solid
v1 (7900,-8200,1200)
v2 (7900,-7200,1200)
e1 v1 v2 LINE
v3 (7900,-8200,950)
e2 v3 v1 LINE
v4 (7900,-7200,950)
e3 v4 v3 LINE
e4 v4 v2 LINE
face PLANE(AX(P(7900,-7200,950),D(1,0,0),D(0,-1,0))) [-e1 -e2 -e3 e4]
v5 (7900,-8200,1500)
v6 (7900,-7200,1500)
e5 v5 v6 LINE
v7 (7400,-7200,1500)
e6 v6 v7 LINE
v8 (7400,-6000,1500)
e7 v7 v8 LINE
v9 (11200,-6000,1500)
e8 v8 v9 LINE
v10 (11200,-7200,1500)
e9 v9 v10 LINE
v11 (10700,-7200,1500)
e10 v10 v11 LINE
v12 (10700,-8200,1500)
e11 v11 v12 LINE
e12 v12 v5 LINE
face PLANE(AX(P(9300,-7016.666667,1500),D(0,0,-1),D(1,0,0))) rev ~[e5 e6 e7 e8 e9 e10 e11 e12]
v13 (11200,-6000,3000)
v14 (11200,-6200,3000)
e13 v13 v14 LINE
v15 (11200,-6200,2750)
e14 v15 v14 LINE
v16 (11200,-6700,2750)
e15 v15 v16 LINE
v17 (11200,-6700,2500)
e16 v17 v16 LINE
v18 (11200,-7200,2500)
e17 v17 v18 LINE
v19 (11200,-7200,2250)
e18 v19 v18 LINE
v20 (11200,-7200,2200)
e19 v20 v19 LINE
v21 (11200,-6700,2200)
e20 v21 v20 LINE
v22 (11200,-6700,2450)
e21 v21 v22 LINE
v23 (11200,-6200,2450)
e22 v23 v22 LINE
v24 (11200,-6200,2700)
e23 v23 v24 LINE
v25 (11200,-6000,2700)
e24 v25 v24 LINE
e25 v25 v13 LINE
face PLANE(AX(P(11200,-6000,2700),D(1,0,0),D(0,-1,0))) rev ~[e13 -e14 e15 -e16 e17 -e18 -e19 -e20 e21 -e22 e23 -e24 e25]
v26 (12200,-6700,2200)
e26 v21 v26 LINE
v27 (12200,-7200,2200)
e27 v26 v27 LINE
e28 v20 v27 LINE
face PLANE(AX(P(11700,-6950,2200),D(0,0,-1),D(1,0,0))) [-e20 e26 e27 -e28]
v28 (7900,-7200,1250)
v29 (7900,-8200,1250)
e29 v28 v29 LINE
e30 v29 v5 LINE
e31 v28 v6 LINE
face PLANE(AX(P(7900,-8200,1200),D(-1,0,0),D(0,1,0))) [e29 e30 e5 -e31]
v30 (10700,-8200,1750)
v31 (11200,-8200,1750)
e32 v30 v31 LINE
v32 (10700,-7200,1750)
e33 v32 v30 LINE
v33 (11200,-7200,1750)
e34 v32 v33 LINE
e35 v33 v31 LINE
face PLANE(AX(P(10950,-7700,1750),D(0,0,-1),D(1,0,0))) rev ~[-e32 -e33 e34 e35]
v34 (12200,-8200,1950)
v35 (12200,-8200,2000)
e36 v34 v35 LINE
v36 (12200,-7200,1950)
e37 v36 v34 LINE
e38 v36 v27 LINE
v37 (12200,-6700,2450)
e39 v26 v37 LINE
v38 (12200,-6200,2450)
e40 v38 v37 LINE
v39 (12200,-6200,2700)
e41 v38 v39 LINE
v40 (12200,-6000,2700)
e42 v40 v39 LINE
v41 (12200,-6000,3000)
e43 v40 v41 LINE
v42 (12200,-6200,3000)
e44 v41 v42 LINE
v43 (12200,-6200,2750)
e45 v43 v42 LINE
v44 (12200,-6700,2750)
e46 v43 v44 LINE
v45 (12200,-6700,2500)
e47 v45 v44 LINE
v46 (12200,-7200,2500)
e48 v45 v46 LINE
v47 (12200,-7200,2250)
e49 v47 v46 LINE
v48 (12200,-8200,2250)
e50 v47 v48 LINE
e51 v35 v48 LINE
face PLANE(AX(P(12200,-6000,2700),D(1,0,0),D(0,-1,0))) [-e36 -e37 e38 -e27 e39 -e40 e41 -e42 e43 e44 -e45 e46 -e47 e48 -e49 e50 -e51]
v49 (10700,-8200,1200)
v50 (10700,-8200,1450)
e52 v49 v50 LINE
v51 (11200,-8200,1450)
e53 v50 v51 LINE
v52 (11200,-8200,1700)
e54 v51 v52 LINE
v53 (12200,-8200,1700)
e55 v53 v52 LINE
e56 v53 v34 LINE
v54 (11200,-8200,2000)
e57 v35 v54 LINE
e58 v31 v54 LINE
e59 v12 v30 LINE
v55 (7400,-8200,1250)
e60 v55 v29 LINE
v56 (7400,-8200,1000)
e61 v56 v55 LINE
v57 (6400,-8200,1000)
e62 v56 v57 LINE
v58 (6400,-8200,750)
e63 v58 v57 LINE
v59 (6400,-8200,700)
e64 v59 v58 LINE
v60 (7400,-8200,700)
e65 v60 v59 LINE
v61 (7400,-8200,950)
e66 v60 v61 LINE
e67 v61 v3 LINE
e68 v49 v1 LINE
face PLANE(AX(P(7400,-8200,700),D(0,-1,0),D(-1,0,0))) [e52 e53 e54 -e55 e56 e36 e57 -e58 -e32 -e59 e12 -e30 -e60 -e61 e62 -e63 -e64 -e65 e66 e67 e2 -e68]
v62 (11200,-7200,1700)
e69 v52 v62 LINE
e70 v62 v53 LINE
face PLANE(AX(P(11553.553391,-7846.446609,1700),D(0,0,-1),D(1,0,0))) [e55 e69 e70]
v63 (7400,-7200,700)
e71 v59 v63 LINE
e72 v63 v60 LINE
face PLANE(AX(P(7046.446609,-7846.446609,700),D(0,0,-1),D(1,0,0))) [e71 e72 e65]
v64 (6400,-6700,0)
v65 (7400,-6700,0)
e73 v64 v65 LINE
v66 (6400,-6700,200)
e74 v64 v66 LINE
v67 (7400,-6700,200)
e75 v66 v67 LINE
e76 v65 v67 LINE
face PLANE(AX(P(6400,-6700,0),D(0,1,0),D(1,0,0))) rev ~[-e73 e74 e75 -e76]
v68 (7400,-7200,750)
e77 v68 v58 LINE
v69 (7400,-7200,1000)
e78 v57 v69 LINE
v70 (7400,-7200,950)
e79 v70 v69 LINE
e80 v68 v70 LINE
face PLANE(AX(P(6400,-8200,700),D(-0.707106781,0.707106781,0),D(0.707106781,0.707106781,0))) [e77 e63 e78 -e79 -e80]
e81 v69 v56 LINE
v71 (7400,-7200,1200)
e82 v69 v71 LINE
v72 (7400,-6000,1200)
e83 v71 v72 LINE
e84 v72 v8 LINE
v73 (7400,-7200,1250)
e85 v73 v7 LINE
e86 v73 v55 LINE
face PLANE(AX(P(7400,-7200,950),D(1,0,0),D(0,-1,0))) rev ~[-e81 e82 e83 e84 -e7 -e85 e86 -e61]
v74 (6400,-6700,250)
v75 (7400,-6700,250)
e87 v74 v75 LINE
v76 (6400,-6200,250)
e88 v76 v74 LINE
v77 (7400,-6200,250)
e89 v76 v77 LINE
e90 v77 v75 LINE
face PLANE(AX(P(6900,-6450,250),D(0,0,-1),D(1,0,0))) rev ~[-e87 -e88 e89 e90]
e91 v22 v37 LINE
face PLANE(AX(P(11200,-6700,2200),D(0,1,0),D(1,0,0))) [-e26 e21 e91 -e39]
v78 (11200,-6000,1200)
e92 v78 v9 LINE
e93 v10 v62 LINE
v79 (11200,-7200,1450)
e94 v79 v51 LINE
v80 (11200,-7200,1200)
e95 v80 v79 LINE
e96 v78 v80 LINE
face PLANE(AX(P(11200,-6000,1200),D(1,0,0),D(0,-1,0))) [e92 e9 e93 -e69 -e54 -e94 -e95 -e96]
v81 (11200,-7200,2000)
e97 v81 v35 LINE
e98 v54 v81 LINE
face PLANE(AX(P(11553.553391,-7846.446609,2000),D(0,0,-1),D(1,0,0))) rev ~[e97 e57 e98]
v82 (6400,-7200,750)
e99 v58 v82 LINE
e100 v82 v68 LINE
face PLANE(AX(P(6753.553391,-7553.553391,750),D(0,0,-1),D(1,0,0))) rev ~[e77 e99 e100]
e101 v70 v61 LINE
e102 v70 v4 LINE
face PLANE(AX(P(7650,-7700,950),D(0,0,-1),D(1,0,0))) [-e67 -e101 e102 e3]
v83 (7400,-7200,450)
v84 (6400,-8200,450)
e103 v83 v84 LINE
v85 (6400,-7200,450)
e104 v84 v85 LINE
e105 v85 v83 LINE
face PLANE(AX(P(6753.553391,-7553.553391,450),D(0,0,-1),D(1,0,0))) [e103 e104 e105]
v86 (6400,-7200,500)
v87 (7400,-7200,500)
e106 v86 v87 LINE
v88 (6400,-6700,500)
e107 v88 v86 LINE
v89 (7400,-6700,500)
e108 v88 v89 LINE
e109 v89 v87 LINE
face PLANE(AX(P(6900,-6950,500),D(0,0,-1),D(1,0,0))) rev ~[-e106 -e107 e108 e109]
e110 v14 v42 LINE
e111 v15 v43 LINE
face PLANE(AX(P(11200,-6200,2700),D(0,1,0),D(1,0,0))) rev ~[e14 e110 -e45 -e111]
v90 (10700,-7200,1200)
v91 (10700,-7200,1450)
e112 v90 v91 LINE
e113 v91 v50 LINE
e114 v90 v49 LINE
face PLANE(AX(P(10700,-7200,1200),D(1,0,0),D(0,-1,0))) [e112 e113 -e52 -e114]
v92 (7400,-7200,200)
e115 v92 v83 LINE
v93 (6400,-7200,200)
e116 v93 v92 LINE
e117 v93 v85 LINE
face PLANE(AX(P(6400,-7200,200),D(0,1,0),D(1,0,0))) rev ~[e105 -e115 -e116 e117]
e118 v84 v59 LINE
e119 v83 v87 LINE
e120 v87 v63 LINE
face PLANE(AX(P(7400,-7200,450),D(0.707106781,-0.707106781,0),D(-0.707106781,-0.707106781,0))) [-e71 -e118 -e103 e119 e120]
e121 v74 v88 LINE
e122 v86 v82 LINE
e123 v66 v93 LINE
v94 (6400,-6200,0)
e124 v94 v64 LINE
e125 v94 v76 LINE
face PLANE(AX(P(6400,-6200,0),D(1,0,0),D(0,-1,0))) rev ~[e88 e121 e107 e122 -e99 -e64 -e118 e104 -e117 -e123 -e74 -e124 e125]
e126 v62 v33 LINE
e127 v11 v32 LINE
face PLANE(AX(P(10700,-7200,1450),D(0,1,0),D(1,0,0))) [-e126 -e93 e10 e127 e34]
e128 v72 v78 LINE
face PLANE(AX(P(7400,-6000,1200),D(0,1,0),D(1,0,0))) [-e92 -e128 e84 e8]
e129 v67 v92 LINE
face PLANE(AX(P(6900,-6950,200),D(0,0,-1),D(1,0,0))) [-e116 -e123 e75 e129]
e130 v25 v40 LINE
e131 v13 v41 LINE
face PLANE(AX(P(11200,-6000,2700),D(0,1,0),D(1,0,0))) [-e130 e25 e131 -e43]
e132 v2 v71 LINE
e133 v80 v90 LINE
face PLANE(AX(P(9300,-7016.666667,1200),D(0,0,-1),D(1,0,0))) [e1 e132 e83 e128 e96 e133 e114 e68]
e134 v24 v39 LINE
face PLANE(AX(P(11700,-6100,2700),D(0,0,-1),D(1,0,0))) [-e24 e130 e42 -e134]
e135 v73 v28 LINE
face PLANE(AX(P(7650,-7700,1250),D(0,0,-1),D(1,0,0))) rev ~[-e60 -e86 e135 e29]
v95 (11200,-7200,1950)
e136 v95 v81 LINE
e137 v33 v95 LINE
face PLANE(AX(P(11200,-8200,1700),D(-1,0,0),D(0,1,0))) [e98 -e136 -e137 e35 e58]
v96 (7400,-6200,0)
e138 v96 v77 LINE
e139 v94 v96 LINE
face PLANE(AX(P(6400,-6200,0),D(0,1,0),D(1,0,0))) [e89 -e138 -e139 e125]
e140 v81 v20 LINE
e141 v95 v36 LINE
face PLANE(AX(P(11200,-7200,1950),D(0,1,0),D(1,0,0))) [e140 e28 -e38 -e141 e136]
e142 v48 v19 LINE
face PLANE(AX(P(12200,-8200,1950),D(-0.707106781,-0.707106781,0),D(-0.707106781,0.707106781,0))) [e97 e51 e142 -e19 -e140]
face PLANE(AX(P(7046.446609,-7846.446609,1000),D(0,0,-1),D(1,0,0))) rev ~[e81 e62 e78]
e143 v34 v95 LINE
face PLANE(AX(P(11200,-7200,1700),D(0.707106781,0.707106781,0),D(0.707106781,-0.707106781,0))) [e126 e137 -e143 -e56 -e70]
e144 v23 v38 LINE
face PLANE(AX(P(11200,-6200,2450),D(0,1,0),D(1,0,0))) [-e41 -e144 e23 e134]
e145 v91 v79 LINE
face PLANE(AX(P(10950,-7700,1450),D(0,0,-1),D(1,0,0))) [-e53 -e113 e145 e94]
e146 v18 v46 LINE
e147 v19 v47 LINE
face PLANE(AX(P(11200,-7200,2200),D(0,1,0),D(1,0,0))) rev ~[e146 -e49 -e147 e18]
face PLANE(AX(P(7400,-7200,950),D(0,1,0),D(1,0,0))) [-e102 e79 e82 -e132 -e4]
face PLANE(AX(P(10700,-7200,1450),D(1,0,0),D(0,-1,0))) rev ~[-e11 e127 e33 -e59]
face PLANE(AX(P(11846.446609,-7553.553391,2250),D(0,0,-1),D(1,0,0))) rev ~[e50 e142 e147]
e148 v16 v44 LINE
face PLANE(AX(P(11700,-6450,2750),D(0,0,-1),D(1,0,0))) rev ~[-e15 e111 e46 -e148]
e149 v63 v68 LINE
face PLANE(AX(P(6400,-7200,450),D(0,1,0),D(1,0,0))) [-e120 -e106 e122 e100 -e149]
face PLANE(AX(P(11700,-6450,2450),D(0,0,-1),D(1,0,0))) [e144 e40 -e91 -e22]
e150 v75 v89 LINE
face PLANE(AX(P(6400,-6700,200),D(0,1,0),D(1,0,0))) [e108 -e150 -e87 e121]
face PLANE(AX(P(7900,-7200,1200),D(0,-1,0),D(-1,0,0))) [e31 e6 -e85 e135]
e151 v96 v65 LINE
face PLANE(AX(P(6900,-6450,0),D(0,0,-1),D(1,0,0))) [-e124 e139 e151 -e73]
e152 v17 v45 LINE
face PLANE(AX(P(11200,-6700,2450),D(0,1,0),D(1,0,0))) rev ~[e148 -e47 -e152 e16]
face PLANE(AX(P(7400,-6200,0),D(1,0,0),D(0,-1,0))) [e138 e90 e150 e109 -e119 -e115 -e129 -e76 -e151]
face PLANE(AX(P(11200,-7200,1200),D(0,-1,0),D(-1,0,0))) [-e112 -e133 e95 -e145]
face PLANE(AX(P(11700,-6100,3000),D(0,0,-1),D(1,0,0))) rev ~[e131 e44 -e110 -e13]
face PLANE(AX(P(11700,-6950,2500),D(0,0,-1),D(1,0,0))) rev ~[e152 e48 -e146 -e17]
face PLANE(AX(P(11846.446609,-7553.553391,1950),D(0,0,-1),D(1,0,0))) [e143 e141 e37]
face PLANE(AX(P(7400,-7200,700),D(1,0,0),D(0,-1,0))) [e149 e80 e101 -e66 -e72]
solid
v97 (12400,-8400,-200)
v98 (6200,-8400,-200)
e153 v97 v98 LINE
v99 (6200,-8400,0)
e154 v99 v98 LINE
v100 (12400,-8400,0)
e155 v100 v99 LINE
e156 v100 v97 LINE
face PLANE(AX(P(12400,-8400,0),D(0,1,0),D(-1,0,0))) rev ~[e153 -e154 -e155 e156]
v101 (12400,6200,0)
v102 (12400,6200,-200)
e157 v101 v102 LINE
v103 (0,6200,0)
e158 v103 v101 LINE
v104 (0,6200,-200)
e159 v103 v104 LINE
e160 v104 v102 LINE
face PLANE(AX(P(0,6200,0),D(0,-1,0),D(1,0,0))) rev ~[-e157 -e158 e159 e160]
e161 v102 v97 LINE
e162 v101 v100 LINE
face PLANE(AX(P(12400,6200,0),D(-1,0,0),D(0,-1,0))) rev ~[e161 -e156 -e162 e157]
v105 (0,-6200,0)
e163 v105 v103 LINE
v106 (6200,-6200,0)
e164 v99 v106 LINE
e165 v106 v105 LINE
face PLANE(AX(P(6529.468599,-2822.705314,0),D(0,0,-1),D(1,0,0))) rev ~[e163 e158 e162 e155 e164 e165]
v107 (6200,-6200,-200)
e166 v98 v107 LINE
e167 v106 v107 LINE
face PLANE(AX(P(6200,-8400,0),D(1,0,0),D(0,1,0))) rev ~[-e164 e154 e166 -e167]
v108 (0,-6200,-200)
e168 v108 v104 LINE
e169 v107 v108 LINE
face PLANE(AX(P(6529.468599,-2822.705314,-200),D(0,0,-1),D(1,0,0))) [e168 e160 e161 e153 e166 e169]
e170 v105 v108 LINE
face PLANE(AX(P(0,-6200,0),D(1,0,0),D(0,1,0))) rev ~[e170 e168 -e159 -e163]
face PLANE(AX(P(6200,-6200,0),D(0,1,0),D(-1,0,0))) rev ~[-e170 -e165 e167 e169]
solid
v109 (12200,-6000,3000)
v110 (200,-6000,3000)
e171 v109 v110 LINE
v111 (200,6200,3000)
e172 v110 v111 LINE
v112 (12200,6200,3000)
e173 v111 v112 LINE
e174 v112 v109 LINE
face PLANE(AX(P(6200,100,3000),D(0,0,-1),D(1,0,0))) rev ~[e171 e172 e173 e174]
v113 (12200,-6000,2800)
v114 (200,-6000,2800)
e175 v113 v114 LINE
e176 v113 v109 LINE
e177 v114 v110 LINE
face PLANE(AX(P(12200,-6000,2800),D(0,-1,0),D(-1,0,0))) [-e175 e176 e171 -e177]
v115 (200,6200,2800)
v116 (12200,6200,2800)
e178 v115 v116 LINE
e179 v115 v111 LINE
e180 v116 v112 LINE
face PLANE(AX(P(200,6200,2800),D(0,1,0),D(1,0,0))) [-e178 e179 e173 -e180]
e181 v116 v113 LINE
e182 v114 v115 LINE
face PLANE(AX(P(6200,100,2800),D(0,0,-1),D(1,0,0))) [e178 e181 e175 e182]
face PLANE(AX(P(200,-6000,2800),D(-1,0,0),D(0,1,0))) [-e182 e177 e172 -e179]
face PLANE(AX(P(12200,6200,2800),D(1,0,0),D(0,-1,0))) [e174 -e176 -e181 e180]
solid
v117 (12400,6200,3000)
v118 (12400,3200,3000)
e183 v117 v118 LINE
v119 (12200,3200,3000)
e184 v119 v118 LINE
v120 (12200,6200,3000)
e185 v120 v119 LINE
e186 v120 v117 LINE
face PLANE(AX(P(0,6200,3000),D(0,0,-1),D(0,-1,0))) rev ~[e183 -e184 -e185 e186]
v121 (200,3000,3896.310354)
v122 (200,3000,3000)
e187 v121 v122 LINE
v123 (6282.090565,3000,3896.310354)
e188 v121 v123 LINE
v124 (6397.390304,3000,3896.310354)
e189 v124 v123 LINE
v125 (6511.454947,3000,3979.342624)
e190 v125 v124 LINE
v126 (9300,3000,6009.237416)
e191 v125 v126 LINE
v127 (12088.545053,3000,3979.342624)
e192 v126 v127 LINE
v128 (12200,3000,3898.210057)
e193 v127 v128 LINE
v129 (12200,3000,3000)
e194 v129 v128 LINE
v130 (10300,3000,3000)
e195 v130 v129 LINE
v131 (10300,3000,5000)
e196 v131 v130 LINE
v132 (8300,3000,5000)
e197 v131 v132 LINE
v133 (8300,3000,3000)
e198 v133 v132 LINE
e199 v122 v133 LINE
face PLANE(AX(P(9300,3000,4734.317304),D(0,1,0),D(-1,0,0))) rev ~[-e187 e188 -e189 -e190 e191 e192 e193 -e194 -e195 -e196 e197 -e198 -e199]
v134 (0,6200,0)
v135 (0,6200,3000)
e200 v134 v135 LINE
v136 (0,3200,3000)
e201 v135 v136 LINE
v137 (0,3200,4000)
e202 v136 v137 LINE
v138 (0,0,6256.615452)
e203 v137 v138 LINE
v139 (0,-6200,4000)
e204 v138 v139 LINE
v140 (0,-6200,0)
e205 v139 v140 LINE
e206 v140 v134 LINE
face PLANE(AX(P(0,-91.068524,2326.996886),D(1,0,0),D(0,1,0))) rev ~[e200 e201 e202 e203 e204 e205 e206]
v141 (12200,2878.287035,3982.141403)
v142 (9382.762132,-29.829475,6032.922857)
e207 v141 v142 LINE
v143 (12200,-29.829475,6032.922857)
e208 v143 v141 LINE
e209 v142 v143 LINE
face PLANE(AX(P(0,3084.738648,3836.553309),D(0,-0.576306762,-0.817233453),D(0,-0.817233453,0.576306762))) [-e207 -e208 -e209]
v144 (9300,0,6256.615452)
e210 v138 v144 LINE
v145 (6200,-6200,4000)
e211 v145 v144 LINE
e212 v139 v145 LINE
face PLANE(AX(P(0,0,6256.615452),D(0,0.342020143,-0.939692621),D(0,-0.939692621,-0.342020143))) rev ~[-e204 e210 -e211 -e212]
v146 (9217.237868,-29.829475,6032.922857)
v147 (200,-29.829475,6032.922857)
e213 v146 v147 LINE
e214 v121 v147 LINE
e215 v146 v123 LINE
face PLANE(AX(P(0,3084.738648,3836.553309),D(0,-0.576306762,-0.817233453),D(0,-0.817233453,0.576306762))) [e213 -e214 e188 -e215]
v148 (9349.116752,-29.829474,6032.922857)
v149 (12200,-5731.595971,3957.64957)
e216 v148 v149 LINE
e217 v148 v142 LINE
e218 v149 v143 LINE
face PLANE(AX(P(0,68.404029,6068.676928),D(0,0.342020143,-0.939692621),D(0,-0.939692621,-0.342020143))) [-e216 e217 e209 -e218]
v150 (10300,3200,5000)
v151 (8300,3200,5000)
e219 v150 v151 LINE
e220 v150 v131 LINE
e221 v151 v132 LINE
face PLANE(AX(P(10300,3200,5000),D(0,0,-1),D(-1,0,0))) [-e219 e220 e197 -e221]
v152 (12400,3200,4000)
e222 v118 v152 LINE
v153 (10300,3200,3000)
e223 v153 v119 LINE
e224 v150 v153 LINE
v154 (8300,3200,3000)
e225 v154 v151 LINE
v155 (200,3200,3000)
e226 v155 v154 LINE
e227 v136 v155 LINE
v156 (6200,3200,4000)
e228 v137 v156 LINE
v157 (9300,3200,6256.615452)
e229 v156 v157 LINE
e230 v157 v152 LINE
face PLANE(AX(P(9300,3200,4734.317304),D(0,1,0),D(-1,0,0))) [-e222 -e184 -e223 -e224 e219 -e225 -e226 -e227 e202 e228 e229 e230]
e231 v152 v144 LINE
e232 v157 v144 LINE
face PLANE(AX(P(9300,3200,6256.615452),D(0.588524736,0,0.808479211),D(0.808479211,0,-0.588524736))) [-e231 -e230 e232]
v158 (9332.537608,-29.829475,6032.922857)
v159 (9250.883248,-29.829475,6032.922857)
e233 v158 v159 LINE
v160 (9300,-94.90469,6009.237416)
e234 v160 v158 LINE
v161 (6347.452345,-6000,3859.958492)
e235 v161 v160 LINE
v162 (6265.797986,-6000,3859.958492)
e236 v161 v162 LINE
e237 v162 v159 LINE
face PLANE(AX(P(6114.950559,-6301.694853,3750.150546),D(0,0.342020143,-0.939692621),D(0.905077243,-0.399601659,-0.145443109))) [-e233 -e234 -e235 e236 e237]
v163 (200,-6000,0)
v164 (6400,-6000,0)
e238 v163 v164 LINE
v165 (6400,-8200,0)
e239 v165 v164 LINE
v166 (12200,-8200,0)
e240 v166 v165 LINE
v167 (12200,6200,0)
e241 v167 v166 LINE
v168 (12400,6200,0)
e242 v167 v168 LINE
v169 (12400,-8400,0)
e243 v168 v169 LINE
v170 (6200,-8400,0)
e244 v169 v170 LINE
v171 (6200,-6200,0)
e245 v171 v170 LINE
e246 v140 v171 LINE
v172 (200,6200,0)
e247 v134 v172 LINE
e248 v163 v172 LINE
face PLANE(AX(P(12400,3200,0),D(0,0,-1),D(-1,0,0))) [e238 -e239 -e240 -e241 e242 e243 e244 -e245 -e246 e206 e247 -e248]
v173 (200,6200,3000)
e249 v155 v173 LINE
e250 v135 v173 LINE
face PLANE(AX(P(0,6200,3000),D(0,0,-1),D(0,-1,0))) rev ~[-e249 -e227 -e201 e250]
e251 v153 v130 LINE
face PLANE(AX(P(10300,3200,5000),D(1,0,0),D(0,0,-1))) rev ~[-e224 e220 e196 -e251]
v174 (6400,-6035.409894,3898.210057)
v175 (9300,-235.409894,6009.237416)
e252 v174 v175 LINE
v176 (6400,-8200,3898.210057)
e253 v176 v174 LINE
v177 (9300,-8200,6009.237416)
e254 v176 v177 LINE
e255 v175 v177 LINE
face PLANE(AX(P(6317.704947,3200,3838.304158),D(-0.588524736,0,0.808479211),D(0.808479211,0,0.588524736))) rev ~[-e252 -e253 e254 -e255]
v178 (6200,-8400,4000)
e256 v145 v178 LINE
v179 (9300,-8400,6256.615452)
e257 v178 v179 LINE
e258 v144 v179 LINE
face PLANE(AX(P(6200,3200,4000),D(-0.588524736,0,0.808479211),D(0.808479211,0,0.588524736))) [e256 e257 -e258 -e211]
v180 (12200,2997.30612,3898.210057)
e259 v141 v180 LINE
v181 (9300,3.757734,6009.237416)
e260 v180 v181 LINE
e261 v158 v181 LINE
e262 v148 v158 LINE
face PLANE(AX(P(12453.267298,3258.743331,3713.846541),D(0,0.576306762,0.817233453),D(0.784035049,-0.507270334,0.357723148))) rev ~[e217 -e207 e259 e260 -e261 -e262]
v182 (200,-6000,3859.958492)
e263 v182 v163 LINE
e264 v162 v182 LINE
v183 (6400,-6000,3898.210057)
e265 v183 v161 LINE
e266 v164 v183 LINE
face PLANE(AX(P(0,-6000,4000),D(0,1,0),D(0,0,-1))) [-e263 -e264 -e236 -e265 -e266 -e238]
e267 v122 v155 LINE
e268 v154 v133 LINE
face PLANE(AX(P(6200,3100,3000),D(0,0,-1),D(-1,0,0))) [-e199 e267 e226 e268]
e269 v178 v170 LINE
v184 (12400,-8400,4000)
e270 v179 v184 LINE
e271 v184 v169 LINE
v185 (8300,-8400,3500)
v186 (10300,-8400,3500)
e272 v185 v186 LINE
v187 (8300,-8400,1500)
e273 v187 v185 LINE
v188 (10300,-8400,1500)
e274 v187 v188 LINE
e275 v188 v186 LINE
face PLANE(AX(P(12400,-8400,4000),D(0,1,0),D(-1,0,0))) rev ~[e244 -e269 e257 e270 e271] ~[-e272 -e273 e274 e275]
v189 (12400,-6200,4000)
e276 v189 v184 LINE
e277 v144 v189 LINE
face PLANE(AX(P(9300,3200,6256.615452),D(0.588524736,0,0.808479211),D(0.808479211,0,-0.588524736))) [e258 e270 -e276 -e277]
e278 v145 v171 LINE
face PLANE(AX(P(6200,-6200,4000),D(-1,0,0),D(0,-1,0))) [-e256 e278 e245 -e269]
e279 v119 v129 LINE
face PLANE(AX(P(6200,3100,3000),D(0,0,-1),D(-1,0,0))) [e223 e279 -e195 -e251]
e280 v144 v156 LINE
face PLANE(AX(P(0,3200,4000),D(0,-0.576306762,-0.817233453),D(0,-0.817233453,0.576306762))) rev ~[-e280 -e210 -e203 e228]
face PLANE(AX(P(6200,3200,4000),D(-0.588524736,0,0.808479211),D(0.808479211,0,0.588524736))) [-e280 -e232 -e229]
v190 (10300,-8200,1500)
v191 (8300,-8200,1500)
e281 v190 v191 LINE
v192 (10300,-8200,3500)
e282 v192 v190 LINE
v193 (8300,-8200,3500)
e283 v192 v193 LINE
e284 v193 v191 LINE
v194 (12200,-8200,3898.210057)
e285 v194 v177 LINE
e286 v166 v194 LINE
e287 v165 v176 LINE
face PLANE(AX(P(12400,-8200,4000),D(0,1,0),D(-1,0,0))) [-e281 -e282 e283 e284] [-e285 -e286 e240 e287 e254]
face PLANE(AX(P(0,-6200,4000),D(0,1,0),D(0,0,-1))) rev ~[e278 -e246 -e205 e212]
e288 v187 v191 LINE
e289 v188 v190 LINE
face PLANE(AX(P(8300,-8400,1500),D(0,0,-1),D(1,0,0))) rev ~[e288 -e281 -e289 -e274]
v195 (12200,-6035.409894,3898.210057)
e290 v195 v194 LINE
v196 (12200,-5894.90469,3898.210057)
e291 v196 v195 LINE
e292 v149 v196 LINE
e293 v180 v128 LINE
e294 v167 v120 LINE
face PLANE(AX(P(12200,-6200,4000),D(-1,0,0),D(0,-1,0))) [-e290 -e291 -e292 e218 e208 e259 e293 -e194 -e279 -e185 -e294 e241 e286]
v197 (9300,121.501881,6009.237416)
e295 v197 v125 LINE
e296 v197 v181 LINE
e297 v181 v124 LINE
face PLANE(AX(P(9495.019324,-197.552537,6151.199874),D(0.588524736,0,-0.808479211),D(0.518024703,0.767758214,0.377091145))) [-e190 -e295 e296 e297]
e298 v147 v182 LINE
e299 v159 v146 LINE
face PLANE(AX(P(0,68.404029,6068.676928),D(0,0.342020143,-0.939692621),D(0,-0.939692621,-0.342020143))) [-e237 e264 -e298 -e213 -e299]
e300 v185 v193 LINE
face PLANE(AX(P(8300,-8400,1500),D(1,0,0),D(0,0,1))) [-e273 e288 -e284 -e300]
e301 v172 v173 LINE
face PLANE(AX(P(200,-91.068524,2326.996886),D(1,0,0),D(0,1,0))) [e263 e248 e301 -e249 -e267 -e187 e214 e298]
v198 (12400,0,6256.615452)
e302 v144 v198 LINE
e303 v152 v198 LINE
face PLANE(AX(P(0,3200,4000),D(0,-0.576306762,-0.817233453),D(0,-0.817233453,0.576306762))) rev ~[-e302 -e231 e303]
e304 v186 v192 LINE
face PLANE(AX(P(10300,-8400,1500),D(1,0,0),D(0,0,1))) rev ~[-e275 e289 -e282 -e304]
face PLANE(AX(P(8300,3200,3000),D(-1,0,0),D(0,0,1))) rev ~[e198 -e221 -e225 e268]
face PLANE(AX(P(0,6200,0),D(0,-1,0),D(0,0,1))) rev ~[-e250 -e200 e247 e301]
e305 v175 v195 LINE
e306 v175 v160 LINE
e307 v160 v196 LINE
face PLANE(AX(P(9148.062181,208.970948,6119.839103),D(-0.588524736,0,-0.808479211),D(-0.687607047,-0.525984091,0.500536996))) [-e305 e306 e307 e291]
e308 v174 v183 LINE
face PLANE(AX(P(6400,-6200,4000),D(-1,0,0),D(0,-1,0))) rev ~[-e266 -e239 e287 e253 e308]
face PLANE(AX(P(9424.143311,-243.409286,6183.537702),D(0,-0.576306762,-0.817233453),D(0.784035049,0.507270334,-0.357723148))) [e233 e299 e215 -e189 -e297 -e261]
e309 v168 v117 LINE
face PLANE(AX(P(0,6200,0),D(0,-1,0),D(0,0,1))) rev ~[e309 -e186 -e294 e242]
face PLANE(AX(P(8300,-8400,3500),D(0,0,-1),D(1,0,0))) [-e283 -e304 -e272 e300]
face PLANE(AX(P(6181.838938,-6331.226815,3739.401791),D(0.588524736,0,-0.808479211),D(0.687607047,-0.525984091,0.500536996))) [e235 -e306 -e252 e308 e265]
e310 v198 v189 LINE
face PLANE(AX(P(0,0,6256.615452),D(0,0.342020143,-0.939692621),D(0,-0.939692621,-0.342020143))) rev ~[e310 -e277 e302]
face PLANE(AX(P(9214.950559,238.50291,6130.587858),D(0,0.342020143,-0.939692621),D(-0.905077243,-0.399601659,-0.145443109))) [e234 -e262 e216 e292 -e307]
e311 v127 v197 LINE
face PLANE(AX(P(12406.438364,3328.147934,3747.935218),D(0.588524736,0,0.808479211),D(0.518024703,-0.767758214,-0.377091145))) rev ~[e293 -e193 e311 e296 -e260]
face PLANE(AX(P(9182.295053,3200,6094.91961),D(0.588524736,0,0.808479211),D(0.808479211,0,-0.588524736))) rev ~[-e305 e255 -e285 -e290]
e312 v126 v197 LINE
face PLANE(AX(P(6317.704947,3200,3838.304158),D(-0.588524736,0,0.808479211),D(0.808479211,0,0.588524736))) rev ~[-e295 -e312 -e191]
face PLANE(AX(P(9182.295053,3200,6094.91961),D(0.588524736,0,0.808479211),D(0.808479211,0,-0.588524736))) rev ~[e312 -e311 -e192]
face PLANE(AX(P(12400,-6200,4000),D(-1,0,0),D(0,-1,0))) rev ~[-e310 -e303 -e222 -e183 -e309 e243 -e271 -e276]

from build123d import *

# Parameters (mm, degrees)
F14_DEPTH    = 12400
F15_W        = 2000
F15_H        = 1000
F0_DEPTH     = 11600
F16_DEPTH    = 4000
F1_T         = 200
F1_T3_DEPTH  = 7689.8774544047
F1_T5_DEPTH  = 5394.2279984236
F1_T7_DEPTH  = 5394.2279984236
F1_T9_DEPTH  = 7689.8774544047
F1_T11_DEPTH = 4400
F2_W         = 2000
F2_H         = 2000
F17_DEPTH    = 2400
F18_DEPTH    = 200
F3_W         = 1000
F3_H         = 500
F3_W_2       = 500
F3_H_2       = 1000
F3_H_3       = 200
F4_DEPTH     = 200
F5_START     = -2800
F5_DEPTH     = 200
F6_START     = -1200
F6_DEPTH     = 300
F7_START     = -1450
F7_DEPTH     = 300
F19_START    = -1700
F19_DEPTH    = 300
F20_START    = -1950
F20_DEPTH    = 300
F21_START    = -2200
F21_DEPTH    = 300
F8_START     = -2450
F8_DEPTH     = 300
F22_START    = -2700
F22_DEPTH    = 300
F9_START     = -950
F9_DEPTH     = 300
F10_START    = -700
F10_DEPTH    = 300
F11_START    = -450
F11_DEPTH    = 300
F23_START    = -200
F23_DEPTH    = 300
F12_DEPTH    = 250


# Not quite as in the source:
# - an extrude ends at something that could not be found from the text; its depth is read off the source's solid
# - a shell that OpenCascade refuses in one call is made with other operations: the cavity is built on its own and cut out


with BuildPart() as f14:
    # F13 (on Right) → F14 (new body)
    with BuildSketch(Plane.YZ):
        Polygon((-6200, 0), (6200, 0), (6200, 3000), (3200, 3000), (3200, 4000), (0, 6256.6154524505), (-6200, 4000), align=None)
    extrude(amount=F14_DEPTH)

    # F15 (on face) → F0 (join)
    with BuildSketch(Plane(origin=(0, 3200, 0), x_dir=(-1, 0, 0), z_dir=(0, 1, 0))):
        Polygon((-9300, 6256.6154524505), (-12400, 4000), (-10300, 4000), (-10300, 5000), (-8300, 5000), (-8300, 4000), (-6200, 4000), align=None)
        with Locations((-9300, 4500)):
            Rectangle(F15_W, F15_H)
    extrude(amount=-F0_DEPTH)

    # F16 (add, through all): a face of the model
    f16_faces = [f14.faces().sort_by_distance(p)[0] for p in [
        (9300, -7300, 4000),
    ]]
    extrude(f16_faces, amount=F16_DEPTH)

    # F1: shell of thickness 200, made by hand


with BuildPart() as f1_core1:
    # F1_t2: copy of F14
    add(f14.part)

    # the walls: a layer under each face that stays
    f1_faces = [f1_core1.faces().sort_by_distance(p)[0] for p in [
        (4650, -3100, 5128.3077262252),
        (4650, 1600, 5128.3077262252),
        (10333.3333333333, 3200, 3542.7692420751),
        (9816.6666666667, 1600, 5880.512877042),
        (11883.3333333333, 1600, 5128.3077262252),
        (11883.3333333333, -1033.3333333333, 5880.512877042),
        (10850, -4200, 5128.3077262252),
        (9300, -8400, 3128.3077262252),
        (6200, -7300, 2000),
        (12400, -1100, 3128.3077262252),
        (7750, 2666.6666666667, 5128.3077262252),
        (7750, -4200, 5128.3077262252),
        (3100, -6200, 2000),
        (0, 0, 3128.3077262252),
    ]]
    thicken(f1_faces, amount=-F1_T, mode=Mode.SUBTRACT)

    # F1_s4 → F1_t3 (cut)
    with BuildSketch(Plane(origin=(-679.6785869535, -1359.357173907, -494.7655490384), x_dir=(-0.894427191, 0.4472135955, 0), z_dir=(0.4252472033, 0.8504944066, 0.3095546484))):
        Polygon((-8317.4260033625, 4665.513258174), (-8287.5816646932, 4464.1897106586), (-8360.6155438547, 4452.8857222652), (-8423.4513815758, 4491.7879735735), align=None)
    extrude(amount=F1_T3_DEPTH, mode=Mode.SUBTRACT)

    # F1_s6 → F1_t5 (cut)
    with BuildSketch(Plane(origin=(5462.1086087811, -5638.3056606773, 3976.089899851), x_dir=(-0.7182402228, -0.6957952158, 0), z_dir=(-0.6207165554, 0.6407396701, -0.4518447002))):
        Polygon((-6679.5906506398, 2661.3103147543), (-6599.4357743978, 2474.4492579485), (-6682.2486847174, 2438.2000137734), (-6764.1744994282, 2476.4118797687), align=None)
    extrude(amount=F1_T5_DEPTH, mode=Mode.SUBTRACT)

    # F1_s8 → F1_t7 (cut)
    with BuildSketch(Plane(origin=(5052.5541970253, 5215.5398162841, -3677.9586694679), x_dir=(0.7182402228, -0.6957952158, 0), z_dir=(-0.6207165554, -0.6407396701, 0.4518447002))):
        Polygon((6679.6774932388, 8508.9899951089), (6595.0936444505, 8324.0915601233), (6677.0194591612, 8285.8796941281), (6759.8323694808, 8322.1289383031), align=None)
    extrude(amount=F1_T7_DEPTH, mode=Mode.SUBTRACT)

    # F1_s10 → F1_t9 (cut)
    with BuildSketch(Plane(origin=(773.1141266852, -1546.2282533704, -562.7810596082), x_dir=(0.894427191, 0.4472135955, 0), z_dir=(0.4252472033, -0.8504944066, -0.3095546484))):
        Polygon((8318.9197492359, 7240.4423384247), (8348.7640879052, 7039.1187909094), (8275.7302087437, 7027.8148025159), (8212.8943710226, 7066.7170538243), align=None)
    extrude(amount=F1_T9_DEPTH, mode=Mode.SUBTRACT)

    # F1_s12 → F1_t11 (cut)
    with BuildSketch(Plane.XY.offset(-200)):
        Polygon((6198, -6202), (6400, -6200), (6400, -6000), (6200, -6000), align=None)
    extrude(amount=F1_T11_DEPTH, mode=Mode.SUBTRACT)


with BuildPart() as f14_1:
    add(f14.part)

    # what is left inside the walls is the cavity
    f1_cavity = [f1_core1.part.solids().sort_by_distance(p)[0] for p in [
        (8200, -1000, 2),
    ]]
    add(f1_cavity, mode=Mode.SUBTRACT)

    # F2 (on face) → F17 (cut, through all)
    with BuildSketch(Plane.XZ.offset(8400)):
        with Locations((9300, 2500)):
            Rectangle(F2_W, F2_H)
    extrude(amount=-F17_DEPTH, mode=Mode.SUBTRACT)

    # F15 (on face) → F18 (cut, through all)
    with BuildSketch(Plane(origin=(0, 3200, 0), x_dir=(-1, 0, 0), z_dir=(0, 1, 0))):
        with Locations((-9300, 3500)):
            Rectangle(F15_W, F15_H)
        with Locations((-9300, 4500)):
            Rectangle(F15_W, F15_H)
    extrude(amount=-F18_DEPTH, mode=Mode.SUBTRACT)


with BuildPart() as f4:
    # F3 (on face) → F4 (new body)
    with BuildSketch(Plane(origin=(0, 0, 0), x_dir=(1, 0, 0), z_dir=(0, 0, -1))):
        Polygon((200, 6000), (6400, 6000), (6400, 6200), (6400, 6700), (6400, 7200), (6400, 8200), (7400, 8200), (7900, 8200), (10700, 8200), (11200, 8200), (12200, 8200), (12200, 7200), (12200, 6700), (12200, 6200), (12200, 6000), (12200, -6200), (12400, -6200), (12400, 8400), (6200, 8400), (6200, 6200), (0, 6200), (0, -6200), (200, -6200), align=None)
        Polygon((7400, 6000), (6400, 6000), (200, 6000), (200, -6200), (12200, -6200), (12200, 6000), (11200, 6000), align=None)
        Polygon((6400, 8200), (6400, 7200), (7400, 7200), align=None)
        with Locations((6900, 6950)):
            Rectangle(F3_W, F3_H)
        Polygon((7400, 8200), (6400, 8200), (7400, 7200), align=None)
        with Locations((7650, 7700)):
            Rectangle(F3_W_2, F3_H_2)
        Polygon((7400, 6200), (7400, 6000), (11200, 6000), (11200, 6200), (11200, 6700), (11200, 7200), (10700, 7200), (10700, 8200), (7900, 8200), (7900, 7200), (7400, 7200), (7400, 6700), align=None)
        with Locations((6900, 6450)):
            Rectangle(F3_W, F3_H)
        with Locations((6900, 6100)):
            Rectangle(F3_W, F3_H_3)
        with Locations((11700, 6100)):
            Rectangle(F3_W, F3_H_3)
        with Locations((11700, 6450)):
            Rectangle(F3_W, F3_H)
        with Locations((11700, 6950)):
            Rectangle(F3_W, F3_H)
        Polygon((12200, 8200), (11200, 7200), (12200, 7200), align=None)
        Polygon((11200, 8200), (11200, 7200), (12200, 8200), align=None)
        with Locations((10950, 7700)):
            Rectangle(F3_W_2, F3_H_2)
    extrude(amount=F4_DEPTH)


with BuildPart() as f5:
    # F3 (on face) → F5 (new body)
    with BuildSketch(Plane(origin=(0, 0, 0), x_dir=(1, 0, 0), z_dir=(0, 0, -1)).offset(F5_START)):
        Polygon((7400, 6000), (6400, 6000), (200, 6000), (200, -6200), (12200, -6200), (12200, 6000), (11200, 6000), align=None)
    extrude(amount=-F5_DEPTH)


with BuildPart() as f6:
    # F3 (on face) → F6 (new body)
    with BuildSketch(Plane(origin=(0, 0, 0), x_dir=(1, 0, 0), z_dir=(0, 0, -1)).offset(F6_START)):
        Polygon((7400, 6200), (7400, 6000), (11200, 6000), (11200, 6200), (11200, 6700), (11200, 7200), (10700, 7200), (10700, 8200), (7900, 8200), (7900, 7200), (7400, 7200), (7400, 6700), align=None)
    extrude(amount=-F6_DEPTH)

    # F3 (on face) → F7 (join)
    with BuildSketch(Plane(origin=(0, 0, 0), x_dir=(1, 0, 0), z_dir=(0, 0, -1)).offset(F7_START)):
        with Locations((10950, 7700)):
            Rectangle(F3_W_2, F3_H_2)
    extrude(amount=-F7_DEPTH)

    # F3 (on face) → F19 (join)
    with BuildSketch(Plane(origin=(0, 0, 0), x_dir=(1, 0, 0), z_dir=(0, 0, -1)).offset(F19_START)):
        Polygon((11200, 8200), (11200, 7200), (12200, 8200), align=None)
    extrude(amount=-F19_DEPTH)

    # F3 (on face) → F20 (join)
    with BuildSketch(Plane(origin=(0, 0, 0), x_dir=(1, 0, 0), z_dir=(0, 0, -1)).offset(F20_START)):
        Polygon((12200, 8200), (11200, 7200), (12200, 7200), align=None)
    extrude(amount=-F20_DEPTH)

    # F3 (on face) → F21 (join)
    with BuildSketch(Plane(origin=(0, 0, 0), x_dir=(1, 0, 0), z_dir=(0, 0, -1)).offset(F21_START)):
        with Locations((11700, 6950)):
            Rectangle(F3_W, F3_H)
    extrude(amount=-F21_DEPTH)

    # F3 (on face) → F8 (join)
    with BuildSketch(Plane(origin=(0, 0, 0), x_dir=(1, 0, 0), z_dir=(0, 0, -1)).offset(F8_START)):
        with Locations((11700, 6450)):
            Rectangle(F3_W, F3_H)
    extrude(amount=-F8_DEPTH)

    # F3 (on face) → F22 (join)
    with BuildSketch(Plane(origin=(0, 0, 0), x_dir=(1, 0, 0), z_dir=(0, 0, -1)).offset(F22_START)):
        with Locations((11700, 6100)):
            Rectangle(F3_W, F3_H_3)
    extrude(amount=-F22_DEPTH)

    # F3 (on face) → F9 (join)
    with BuildSketch(Plane(origin=(0, 0, 0), x_dir=(1, 0, 0), z_dir=(0, 0, -1)).offset(F9_START)):
        with Locations((7650, 7700)):
            Rectangle(F3_W_2, F3_H_2)
    extrude(amount=-F9_DEPTH)

    # F3 (on face) → F10 (join)
    with BuildSketch(Plane(origin=(0, 0, 0), x_dir=(1, 0, 0), z_dir=(0, 0, -1)).offset(F10_START)):
        Polygon((7400, 8200), (6400, 8200), (7400, 7200), align=None)
    extrude(amount=-F10_DEPTH)

    # F3 (on face) → F11 (join)
    with BuildSketch(Plane(origin=(0, 0, 0), x_dir=(1, 0, 0), z_dir=(0, 0, -1)).offset(F11_START)):
        Polygon((6400, 8200), (6400, 7200), (7400, 7200), align=None)
    extrude(amount=-F11_DEPTH)

    # F3 (on face) → F23 (join)
    with BuildSketch(Plane(origin=(0, 0, 0), x_dir=(1, 0, 0), z_dir=(0, 0, -1)).offset(F23_START)):
        with Locations((6900, 6950)):
            Rectangle(F3_W, F3_H)
    extrude(amount=-F23_DEPTH)

    # F3 (on face) → F12 (join)
    with BuildSketch(Plane(origin=(0, 0, 0), x_dir=(1, 0, 0), z_dir=(0, 0, -1))):
        with Locations((6900, 6450)):
            Rectangle(F3_W, F3_H)
    extrude(amount=-F12_DEPTH)


solid = Compound([f14_1.part, f4.part, f5.part, f6.part])
